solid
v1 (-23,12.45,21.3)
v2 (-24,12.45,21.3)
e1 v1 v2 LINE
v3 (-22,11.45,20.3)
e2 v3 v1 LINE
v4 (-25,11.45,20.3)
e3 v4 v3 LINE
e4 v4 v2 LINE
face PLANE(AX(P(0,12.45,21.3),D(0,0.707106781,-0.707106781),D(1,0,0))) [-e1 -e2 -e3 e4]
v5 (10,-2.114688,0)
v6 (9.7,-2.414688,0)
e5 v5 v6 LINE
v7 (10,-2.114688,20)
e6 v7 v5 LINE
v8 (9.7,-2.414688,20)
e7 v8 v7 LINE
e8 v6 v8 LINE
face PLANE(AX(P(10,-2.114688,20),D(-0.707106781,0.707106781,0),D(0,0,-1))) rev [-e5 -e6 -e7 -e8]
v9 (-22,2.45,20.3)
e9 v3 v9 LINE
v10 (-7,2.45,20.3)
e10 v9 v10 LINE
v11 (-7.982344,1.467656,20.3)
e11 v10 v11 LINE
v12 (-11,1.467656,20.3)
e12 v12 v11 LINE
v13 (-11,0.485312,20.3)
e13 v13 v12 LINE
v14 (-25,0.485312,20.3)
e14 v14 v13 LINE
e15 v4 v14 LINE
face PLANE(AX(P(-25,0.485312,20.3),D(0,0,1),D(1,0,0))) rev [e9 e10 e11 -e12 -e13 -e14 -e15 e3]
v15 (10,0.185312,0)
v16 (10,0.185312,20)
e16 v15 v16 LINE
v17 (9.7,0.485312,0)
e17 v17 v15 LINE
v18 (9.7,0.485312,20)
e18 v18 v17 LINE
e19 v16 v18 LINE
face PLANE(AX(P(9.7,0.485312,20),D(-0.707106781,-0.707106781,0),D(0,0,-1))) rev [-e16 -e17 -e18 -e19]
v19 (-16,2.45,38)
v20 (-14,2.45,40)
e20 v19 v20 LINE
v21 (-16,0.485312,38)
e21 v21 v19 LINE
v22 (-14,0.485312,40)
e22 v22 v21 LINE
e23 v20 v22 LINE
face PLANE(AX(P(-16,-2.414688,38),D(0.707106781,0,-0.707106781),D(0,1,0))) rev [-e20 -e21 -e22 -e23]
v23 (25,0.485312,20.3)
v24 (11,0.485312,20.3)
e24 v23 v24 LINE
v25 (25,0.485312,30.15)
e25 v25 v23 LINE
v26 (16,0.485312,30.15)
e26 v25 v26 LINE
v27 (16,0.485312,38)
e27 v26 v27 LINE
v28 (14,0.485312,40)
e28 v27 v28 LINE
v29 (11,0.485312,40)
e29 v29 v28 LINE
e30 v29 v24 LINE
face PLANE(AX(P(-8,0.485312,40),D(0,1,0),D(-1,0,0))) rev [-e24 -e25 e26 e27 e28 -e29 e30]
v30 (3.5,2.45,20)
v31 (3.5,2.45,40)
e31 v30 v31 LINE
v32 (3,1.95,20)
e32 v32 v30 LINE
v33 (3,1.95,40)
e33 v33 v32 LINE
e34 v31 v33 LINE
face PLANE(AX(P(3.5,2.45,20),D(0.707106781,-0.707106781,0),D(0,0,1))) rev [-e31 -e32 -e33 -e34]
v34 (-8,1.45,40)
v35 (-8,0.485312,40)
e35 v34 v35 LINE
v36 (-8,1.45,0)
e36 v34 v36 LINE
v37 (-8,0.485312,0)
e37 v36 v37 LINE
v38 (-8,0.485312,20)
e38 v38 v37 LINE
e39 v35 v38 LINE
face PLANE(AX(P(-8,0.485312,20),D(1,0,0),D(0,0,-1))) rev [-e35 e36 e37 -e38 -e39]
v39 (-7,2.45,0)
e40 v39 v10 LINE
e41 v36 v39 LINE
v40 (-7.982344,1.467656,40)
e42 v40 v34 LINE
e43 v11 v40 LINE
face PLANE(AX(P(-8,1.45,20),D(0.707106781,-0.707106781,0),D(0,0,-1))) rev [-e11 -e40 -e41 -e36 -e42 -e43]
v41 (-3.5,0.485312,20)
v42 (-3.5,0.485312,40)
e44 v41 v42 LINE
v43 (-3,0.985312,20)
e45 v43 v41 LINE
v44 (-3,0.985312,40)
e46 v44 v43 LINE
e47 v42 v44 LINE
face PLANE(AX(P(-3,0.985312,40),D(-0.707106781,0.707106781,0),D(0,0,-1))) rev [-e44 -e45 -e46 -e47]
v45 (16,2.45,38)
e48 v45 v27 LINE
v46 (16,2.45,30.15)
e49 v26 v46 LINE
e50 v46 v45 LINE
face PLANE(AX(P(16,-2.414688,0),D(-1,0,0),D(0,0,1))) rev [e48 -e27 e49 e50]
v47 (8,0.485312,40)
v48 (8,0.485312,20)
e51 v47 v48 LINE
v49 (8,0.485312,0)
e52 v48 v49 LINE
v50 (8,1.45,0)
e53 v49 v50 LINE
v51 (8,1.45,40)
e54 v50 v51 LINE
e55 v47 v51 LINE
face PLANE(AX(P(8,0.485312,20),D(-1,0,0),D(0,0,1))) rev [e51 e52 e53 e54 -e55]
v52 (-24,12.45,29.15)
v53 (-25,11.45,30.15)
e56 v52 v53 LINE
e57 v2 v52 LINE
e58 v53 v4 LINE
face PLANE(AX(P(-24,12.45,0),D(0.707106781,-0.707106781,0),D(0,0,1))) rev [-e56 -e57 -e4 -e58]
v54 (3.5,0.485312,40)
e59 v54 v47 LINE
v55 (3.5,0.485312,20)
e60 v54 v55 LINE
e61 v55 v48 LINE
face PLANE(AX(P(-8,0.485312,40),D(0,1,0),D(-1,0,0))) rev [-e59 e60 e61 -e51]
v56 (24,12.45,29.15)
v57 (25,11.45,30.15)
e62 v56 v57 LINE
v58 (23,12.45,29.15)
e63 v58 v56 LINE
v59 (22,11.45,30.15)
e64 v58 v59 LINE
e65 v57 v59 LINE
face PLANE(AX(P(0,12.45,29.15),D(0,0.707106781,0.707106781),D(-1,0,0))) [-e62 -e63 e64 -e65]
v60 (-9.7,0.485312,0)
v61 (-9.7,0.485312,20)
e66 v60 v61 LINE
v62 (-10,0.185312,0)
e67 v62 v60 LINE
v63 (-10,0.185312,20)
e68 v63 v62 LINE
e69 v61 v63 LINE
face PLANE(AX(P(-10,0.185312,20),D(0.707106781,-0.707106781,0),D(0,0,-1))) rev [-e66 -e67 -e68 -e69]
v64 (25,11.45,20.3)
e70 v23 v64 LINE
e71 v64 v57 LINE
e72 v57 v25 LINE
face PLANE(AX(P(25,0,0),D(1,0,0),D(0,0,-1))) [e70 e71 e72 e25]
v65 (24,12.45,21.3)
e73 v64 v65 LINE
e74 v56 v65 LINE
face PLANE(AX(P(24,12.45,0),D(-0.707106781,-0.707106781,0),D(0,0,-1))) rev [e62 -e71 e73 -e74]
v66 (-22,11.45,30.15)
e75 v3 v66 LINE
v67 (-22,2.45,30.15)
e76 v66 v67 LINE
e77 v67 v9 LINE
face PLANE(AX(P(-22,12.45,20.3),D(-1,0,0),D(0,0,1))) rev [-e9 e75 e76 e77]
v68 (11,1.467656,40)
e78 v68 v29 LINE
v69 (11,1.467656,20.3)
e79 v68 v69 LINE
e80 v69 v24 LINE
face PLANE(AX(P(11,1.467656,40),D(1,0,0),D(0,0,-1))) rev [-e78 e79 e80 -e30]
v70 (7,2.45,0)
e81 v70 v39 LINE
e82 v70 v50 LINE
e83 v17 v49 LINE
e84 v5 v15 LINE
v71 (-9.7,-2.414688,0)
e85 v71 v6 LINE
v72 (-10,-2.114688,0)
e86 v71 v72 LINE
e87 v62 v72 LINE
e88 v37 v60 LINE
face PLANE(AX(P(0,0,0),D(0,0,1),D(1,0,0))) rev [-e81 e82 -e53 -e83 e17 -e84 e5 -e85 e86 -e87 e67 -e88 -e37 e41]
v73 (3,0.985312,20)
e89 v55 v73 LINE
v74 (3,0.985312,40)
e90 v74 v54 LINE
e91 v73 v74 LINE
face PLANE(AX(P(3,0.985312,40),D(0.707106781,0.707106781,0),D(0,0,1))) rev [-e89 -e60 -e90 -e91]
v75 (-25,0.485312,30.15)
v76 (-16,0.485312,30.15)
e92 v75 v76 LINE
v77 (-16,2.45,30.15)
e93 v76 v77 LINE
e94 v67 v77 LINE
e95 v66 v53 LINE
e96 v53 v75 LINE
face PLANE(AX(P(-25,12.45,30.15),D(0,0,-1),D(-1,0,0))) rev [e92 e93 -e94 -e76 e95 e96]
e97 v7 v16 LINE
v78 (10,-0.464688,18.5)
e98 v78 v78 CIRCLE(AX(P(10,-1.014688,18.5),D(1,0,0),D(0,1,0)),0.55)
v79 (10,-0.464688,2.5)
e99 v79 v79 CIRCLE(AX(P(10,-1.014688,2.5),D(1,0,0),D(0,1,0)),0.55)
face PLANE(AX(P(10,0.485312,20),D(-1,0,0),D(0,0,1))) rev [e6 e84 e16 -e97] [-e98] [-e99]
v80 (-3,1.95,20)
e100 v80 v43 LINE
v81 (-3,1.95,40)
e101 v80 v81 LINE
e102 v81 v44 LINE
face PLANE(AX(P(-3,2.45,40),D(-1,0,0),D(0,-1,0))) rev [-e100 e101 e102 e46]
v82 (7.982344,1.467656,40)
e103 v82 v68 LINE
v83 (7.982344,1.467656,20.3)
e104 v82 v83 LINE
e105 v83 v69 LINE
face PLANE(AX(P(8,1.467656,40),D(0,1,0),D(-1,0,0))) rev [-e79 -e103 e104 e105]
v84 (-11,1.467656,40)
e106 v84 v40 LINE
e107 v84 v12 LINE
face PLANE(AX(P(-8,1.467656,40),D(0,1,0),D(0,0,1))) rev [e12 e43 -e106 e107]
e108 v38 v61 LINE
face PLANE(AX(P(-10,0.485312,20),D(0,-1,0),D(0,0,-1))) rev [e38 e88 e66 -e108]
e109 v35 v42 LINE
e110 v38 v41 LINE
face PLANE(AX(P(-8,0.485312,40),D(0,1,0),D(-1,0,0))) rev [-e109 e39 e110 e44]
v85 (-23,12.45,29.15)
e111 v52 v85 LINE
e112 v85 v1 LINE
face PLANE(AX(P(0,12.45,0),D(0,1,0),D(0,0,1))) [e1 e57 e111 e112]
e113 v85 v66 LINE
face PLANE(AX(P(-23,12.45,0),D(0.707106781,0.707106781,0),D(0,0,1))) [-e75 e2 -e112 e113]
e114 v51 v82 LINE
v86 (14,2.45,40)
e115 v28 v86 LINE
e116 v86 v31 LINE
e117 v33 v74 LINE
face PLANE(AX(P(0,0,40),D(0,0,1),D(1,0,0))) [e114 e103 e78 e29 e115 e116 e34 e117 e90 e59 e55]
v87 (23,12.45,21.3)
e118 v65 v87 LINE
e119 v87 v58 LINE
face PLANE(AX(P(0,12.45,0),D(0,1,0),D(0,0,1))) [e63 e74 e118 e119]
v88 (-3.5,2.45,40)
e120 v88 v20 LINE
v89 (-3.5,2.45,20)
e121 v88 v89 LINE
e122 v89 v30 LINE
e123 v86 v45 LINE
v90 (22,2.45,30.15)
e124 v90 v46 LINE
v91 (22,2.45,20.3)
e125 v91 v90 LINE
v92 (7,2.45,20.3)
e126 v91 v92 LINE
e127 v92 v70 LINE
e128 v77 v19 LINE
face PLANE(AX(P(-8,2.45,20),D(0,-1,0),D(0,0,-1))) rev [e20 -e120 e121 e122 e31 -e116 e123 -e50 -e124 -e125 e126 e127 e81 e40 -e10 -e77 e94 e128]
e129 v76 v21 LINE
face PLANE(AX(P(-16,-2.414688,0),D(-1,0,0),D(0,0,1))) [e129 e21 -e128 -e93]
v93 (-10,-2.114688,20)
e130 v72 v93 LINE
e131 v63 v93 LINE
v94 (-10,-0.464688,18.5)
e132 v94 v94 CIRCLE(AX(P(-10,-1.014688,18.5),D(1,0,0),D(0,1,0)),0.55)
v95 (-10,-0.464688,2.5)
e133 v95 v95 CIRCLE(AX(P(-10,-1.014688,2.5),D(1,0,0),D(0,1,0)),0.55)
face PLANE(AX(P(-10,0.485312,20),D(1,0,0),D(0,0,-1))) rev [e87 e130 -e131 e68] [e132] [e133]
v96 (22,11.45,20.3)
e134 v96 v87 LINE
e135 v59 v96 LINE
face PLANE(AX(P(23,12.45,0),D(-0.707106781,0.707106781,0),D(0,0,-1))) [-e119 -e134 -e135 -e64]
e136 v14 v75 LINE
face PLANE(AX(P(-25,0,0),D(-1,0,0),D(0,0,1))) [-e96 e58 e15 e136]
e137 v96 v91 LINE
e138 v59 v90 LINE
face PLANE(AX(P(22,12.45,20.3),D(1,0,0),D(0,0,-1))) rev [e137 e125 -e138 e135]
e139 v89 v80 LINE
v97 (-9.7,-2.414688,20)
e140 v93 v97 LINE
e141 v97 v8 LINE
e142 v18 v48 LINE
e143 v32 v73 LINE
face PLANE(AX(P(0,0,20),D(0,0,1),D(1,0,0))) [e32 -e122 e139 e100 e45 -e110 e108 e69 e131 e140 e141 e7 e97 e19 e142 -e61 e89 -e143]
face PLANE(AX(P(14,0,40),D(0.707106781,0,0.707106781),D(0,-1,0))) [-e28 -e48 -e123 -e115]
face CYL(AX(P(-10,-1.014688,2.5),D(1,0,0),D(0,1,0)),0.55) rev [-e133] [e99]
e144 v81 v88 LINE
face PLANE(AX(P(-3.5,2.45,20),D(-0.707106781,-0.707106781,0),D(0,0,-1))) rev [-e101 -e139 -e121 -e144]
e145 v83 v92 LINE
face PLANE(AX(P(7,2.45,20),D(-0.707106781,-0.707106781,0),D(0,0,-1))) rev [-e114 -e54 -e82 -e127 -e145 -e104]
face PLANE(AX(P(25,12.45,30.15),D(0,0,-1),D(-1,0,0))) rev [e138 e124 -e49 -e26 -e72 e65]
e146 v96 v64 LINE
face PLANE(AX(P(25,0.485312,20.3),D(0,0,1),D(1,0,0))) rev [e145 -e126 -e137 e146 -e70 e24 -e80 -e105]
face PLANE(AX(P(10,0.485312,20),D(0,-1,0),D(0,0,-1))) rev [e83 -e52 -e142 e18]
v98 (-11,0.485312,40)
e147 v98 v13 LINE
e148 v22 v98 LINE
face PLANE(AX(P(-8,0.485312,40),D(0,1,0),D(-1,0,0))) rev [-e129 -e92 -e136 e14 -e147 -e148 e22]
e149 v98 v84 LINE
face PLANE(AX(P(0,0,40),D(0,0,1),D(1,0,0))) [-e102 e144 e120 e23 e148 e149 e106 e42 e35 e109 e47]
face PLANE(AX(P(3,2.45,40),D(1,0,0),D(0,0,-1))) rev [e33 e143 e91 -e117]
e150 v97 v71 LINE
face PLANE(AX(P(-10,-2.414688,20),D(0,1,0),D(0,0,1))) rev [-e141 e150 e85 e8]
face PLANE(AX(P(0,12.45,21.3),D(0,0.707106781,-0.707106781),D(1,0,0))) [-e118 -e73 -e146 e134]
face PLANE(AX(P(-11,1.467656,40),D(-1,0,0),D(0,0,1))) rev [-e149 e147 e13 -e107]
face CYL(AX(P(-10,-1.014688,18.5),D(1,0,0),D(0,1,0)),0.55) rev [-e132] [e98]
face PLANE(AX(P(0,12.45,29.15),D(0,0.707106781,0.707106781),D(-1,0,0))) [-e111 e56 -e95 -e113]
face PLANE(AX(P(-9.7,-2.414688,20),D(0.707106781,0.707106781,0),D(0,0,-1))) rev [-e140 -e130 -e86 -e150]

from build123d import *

# Parameters (mm, degrees)
EXTRUDE_1_DEPTH     = 20
SKETCH_2_R          = 0.55
CUT_EXTRUDE_1_DEPTH = 29.390183162
SKETCH_3_W          = 16
SKETCH_3_H          = 1.96468827
EXTRUDE_2_DEPTH     = 20
SKETCH_4_W          = 6
SKETCH_4_H          = 20
CUT_EXTRUDE_2_DEPTH = 42.332916665
SKETCH_6_W          = 19.7
SKETCH_6_H          = 1.96468827
EXTRUDE_13_DEPTH    = 17
SKETCH_7_W          = 19.7
SKETCH_7_H          = 1.96468827
EXTRUDE_14_DEPTH    = 17
SKETCH_8_W          = 3
SKETCH_8_H          = 9.85
EXTRUDE_15_DEPTH    = 10
CHAMFER_1_SIZE      = 0.3
SKETCH_10_W         = 3
SKETCH_10_H         = 0.982344135
CUT_EXTRUDE_3_DEPTH = 35.526692573
CHAMFER_3_SIZE      = 0.5
CHAMFER_4_DEPTH     = 20.3
CHAMFER_START       = 20.3
CHAMFER_4_2_DEPTH   = 20.7
CHAMFER_5_SIZE      = 1
CUT_EXTRUDE_4_DEPTH = 49.218253805
CHAMFER_6_SIZE      = 2


with BuildPart() as part:
    # 草图1 → 凸台-拉伸1 (new body)
    with BuildSketch(Plane.XY):
        Polygon((-10, 0.48531173), (-8, 0.48531173), (-8, 2.45), (8, 2.45), (8, 0.48531173), (10, 0.48531173), (10, -2.41468827), (-10, -2.41468827), align=None)
    extrude(amount=EXTRUDE_1_DEPTH)

    # 草图2 → 切除-拉伸1 (cut, through all)
    with BuildSketch(Plane(origin=(10, 0, 0), x_dir=(0, 0, -1), z_dir=(1, 0, 0))):
        with Locations(Location((-2.5, -1.01468827, 0), (0, 0, 90))):
            Circle(SKETCH_2_R)
        with Locations(Location((-18.5, -1.01468827, 0), (0, 0, 90))):
            Circle(SKETCH_2_R)
    extrude(amount=-CUT_EXTRUDE_1_DEPTH, mode=Mode.SUBTRACT)

    # 草图3 → 凸台-拉伸2 (add)
    with BuildSketch(Plane.XY.offset(20)):
        with Locations((0, 1.467655865)):
            Rectangle(SKETCH_3_W, SKETCH_3_H)
    extrude(amount=EXTRUDE_2_DEPTH)

    # 草图4 → 切除-拉伸2 (cut, through all)
    with BuildSketch(Plane.XZ.offset(-0.48531173)):
        with Locations((0, 30)):
            Rectangle(SKETCH_4_W, SKETCH_4_H)
    extrude(amount=-CUT_EXTRUDE_2_DEPTH, mode=Mode.SUBTRACT)

    # 草图6 → 凸台-拉伸13 (add)
    with BuildSketch(Plane.ZY.offset(8)):
        with Locations((30.15, 1.467655865)):
            Rectangle(SKETCH_6_W, SKETCH_6_H)
    extrude(amount=EXTRUDE_13_DEPTH)

    # 草图7 → 凸台-拉伸14 (add)
    with BuildSketch(Plane(origin=(8, 0, 0), x_dir=(0, 0, -1), z_dir=(1, 0, 0))):
        with Locations((-30.15, 1.467655865)):
            Rectangle(SKETCH_7_W, SKETCH_7_H)
    extrude(amount=EXTRUDE_14_DEPTH)

    # 草图8 → 凸台-拉伸15 (add)
    with BuildSketch(Plane(origin=(0, 2.45, 0), x_dir=(1, 0, 0), z_dir=(0, 1, 0))):
        with Locations((-23.5, -25.225)):
            Rectangle(SKETCH_8_W, SKETCH_8_H)
        with Locations((23.5, -25.225)):
            Rectangle(SKETCH_8_W, SKETCH_8_H)
    extrude(amount=EXTRUDE_15_DEPTH)

    # 倒角1
    chamfer_1_edges = [part.edges().sort_by_distance(p)[0] for p in [
        (10, -2.41468827, 10),
        (-10, -2.41468827, 10),
        (-10, 0.48531173, 10),
        (10, 0.48531173, 10),
    ]]
    chamfer(chamfer_1_edges, length=CHAMFER_1_SIZE)

    # 草图10 → 切除-拉伸3 (cut, through all)
    with BuildSketch(Plane(origin=(0, 0, 20.3), x_dir=(-1, 0, 0), z_dir=(0, 0, -1))):
        with Locations((-9.5, 0.976483798)):
            Rectangle(SKETCH_10_W, SKETCH_10_H)
        with Locations((9.5, 0.976483798)):
            Rectangle(SKETCH_10_W, SKETCH_10_H)
    extrude(amount=-CUT_EXTRUDE_3_DEPTH, mode=Mode.SUBTRACT)

    # 倒角3
    chamfer_3_edges = [part.edges().sort_by_distance(p)[0] for p in [
        (3, 2.45, 30),
        (-3, 2.45, 30),
        (-3, 0.48531173, 30),
        (3, 0.48531173, 30),
    ]]
    chamfer(chamfer_3_edges, length=CHAMFER_3_SIZE)

    # 倒角4: read off the stored shape, not the designer's step
    # 倒角4 outline → 倒角4 (cut)
    with BuildSketch(Plane.XY):
        Polygon((-8, 1.45), (-7, 2.45), (-8, 2.45), align=None)
        Polygon((8, 2.45), (7, 2.45), (8, 1.45), align=None)
    extrude(amount=CHAMFER_4_DEPTH, mode=Mode.SUBTRACT)

    # Chamfer 4 2 outline → Chamfer 4 2 (cut)
    with BuildSketch(Plane.XY.offset(CHAMFER_START)):
        Polygon((-8, 1.467655865), (-8, 1.45), (-7.982344135, 1.467655865), align=None)
        Polygon((8, 1.467655865), (7.982344135, 1.467655865), (8, 1.45), align=None)
    extrude(amount=CHAMFER_4_2_DEPTH, mode=Mode.SUBTRACT)

    # 倒角5
    chamfer_5_edges = [part.edges().sort_by_distance(p)[0] for p in [
        (23.5, 12.45, 20.3),
        (22, 12.45, 25.225),
        (23.5, 12.45, 30.15),
        (25, 12.45, 25.225),
        (-23.5, 12.45, 20.3),
        (-25, 12.45, 25.225),
        (-23.5, 12.45, 30.15),
        (-22, 12.45, 25.225),
    ]]
    chamfer(chamfer_5_edges, length=CHAMFER_5_SIZE)

    # 草图11 → 切除-拉伸4 (cut, through all)
    with BuildSketch(Plane(origin=(0, 2.45, 0), x_dir=(1, 0, 0), z_dir=(0, 1, 0))):
        Polygon((-22, -30.15), (-25, -30.15), (-25, -40), (-16, -40), (-16, -30.15), align=None)
        Polygon((16, -30.15), (16, -40), (25, -40), (25, -30.15), (22, -30.15), align=None)
    extrude(amount=-CUT_EXTRUDE_4_DEPTH, mode=Mode.SUBTRACT)

    # 倒角6
    chamfer_6_edges = [part.edges().sort_by_distance(p)[0] for p in [
        (-16, 1.467655865, 40),
        (16, 1.467655865, 40),
    ]]
    chamfer(chamfer_6_edges, length=CHAMFER_6_SIZE)


solid = part.part
